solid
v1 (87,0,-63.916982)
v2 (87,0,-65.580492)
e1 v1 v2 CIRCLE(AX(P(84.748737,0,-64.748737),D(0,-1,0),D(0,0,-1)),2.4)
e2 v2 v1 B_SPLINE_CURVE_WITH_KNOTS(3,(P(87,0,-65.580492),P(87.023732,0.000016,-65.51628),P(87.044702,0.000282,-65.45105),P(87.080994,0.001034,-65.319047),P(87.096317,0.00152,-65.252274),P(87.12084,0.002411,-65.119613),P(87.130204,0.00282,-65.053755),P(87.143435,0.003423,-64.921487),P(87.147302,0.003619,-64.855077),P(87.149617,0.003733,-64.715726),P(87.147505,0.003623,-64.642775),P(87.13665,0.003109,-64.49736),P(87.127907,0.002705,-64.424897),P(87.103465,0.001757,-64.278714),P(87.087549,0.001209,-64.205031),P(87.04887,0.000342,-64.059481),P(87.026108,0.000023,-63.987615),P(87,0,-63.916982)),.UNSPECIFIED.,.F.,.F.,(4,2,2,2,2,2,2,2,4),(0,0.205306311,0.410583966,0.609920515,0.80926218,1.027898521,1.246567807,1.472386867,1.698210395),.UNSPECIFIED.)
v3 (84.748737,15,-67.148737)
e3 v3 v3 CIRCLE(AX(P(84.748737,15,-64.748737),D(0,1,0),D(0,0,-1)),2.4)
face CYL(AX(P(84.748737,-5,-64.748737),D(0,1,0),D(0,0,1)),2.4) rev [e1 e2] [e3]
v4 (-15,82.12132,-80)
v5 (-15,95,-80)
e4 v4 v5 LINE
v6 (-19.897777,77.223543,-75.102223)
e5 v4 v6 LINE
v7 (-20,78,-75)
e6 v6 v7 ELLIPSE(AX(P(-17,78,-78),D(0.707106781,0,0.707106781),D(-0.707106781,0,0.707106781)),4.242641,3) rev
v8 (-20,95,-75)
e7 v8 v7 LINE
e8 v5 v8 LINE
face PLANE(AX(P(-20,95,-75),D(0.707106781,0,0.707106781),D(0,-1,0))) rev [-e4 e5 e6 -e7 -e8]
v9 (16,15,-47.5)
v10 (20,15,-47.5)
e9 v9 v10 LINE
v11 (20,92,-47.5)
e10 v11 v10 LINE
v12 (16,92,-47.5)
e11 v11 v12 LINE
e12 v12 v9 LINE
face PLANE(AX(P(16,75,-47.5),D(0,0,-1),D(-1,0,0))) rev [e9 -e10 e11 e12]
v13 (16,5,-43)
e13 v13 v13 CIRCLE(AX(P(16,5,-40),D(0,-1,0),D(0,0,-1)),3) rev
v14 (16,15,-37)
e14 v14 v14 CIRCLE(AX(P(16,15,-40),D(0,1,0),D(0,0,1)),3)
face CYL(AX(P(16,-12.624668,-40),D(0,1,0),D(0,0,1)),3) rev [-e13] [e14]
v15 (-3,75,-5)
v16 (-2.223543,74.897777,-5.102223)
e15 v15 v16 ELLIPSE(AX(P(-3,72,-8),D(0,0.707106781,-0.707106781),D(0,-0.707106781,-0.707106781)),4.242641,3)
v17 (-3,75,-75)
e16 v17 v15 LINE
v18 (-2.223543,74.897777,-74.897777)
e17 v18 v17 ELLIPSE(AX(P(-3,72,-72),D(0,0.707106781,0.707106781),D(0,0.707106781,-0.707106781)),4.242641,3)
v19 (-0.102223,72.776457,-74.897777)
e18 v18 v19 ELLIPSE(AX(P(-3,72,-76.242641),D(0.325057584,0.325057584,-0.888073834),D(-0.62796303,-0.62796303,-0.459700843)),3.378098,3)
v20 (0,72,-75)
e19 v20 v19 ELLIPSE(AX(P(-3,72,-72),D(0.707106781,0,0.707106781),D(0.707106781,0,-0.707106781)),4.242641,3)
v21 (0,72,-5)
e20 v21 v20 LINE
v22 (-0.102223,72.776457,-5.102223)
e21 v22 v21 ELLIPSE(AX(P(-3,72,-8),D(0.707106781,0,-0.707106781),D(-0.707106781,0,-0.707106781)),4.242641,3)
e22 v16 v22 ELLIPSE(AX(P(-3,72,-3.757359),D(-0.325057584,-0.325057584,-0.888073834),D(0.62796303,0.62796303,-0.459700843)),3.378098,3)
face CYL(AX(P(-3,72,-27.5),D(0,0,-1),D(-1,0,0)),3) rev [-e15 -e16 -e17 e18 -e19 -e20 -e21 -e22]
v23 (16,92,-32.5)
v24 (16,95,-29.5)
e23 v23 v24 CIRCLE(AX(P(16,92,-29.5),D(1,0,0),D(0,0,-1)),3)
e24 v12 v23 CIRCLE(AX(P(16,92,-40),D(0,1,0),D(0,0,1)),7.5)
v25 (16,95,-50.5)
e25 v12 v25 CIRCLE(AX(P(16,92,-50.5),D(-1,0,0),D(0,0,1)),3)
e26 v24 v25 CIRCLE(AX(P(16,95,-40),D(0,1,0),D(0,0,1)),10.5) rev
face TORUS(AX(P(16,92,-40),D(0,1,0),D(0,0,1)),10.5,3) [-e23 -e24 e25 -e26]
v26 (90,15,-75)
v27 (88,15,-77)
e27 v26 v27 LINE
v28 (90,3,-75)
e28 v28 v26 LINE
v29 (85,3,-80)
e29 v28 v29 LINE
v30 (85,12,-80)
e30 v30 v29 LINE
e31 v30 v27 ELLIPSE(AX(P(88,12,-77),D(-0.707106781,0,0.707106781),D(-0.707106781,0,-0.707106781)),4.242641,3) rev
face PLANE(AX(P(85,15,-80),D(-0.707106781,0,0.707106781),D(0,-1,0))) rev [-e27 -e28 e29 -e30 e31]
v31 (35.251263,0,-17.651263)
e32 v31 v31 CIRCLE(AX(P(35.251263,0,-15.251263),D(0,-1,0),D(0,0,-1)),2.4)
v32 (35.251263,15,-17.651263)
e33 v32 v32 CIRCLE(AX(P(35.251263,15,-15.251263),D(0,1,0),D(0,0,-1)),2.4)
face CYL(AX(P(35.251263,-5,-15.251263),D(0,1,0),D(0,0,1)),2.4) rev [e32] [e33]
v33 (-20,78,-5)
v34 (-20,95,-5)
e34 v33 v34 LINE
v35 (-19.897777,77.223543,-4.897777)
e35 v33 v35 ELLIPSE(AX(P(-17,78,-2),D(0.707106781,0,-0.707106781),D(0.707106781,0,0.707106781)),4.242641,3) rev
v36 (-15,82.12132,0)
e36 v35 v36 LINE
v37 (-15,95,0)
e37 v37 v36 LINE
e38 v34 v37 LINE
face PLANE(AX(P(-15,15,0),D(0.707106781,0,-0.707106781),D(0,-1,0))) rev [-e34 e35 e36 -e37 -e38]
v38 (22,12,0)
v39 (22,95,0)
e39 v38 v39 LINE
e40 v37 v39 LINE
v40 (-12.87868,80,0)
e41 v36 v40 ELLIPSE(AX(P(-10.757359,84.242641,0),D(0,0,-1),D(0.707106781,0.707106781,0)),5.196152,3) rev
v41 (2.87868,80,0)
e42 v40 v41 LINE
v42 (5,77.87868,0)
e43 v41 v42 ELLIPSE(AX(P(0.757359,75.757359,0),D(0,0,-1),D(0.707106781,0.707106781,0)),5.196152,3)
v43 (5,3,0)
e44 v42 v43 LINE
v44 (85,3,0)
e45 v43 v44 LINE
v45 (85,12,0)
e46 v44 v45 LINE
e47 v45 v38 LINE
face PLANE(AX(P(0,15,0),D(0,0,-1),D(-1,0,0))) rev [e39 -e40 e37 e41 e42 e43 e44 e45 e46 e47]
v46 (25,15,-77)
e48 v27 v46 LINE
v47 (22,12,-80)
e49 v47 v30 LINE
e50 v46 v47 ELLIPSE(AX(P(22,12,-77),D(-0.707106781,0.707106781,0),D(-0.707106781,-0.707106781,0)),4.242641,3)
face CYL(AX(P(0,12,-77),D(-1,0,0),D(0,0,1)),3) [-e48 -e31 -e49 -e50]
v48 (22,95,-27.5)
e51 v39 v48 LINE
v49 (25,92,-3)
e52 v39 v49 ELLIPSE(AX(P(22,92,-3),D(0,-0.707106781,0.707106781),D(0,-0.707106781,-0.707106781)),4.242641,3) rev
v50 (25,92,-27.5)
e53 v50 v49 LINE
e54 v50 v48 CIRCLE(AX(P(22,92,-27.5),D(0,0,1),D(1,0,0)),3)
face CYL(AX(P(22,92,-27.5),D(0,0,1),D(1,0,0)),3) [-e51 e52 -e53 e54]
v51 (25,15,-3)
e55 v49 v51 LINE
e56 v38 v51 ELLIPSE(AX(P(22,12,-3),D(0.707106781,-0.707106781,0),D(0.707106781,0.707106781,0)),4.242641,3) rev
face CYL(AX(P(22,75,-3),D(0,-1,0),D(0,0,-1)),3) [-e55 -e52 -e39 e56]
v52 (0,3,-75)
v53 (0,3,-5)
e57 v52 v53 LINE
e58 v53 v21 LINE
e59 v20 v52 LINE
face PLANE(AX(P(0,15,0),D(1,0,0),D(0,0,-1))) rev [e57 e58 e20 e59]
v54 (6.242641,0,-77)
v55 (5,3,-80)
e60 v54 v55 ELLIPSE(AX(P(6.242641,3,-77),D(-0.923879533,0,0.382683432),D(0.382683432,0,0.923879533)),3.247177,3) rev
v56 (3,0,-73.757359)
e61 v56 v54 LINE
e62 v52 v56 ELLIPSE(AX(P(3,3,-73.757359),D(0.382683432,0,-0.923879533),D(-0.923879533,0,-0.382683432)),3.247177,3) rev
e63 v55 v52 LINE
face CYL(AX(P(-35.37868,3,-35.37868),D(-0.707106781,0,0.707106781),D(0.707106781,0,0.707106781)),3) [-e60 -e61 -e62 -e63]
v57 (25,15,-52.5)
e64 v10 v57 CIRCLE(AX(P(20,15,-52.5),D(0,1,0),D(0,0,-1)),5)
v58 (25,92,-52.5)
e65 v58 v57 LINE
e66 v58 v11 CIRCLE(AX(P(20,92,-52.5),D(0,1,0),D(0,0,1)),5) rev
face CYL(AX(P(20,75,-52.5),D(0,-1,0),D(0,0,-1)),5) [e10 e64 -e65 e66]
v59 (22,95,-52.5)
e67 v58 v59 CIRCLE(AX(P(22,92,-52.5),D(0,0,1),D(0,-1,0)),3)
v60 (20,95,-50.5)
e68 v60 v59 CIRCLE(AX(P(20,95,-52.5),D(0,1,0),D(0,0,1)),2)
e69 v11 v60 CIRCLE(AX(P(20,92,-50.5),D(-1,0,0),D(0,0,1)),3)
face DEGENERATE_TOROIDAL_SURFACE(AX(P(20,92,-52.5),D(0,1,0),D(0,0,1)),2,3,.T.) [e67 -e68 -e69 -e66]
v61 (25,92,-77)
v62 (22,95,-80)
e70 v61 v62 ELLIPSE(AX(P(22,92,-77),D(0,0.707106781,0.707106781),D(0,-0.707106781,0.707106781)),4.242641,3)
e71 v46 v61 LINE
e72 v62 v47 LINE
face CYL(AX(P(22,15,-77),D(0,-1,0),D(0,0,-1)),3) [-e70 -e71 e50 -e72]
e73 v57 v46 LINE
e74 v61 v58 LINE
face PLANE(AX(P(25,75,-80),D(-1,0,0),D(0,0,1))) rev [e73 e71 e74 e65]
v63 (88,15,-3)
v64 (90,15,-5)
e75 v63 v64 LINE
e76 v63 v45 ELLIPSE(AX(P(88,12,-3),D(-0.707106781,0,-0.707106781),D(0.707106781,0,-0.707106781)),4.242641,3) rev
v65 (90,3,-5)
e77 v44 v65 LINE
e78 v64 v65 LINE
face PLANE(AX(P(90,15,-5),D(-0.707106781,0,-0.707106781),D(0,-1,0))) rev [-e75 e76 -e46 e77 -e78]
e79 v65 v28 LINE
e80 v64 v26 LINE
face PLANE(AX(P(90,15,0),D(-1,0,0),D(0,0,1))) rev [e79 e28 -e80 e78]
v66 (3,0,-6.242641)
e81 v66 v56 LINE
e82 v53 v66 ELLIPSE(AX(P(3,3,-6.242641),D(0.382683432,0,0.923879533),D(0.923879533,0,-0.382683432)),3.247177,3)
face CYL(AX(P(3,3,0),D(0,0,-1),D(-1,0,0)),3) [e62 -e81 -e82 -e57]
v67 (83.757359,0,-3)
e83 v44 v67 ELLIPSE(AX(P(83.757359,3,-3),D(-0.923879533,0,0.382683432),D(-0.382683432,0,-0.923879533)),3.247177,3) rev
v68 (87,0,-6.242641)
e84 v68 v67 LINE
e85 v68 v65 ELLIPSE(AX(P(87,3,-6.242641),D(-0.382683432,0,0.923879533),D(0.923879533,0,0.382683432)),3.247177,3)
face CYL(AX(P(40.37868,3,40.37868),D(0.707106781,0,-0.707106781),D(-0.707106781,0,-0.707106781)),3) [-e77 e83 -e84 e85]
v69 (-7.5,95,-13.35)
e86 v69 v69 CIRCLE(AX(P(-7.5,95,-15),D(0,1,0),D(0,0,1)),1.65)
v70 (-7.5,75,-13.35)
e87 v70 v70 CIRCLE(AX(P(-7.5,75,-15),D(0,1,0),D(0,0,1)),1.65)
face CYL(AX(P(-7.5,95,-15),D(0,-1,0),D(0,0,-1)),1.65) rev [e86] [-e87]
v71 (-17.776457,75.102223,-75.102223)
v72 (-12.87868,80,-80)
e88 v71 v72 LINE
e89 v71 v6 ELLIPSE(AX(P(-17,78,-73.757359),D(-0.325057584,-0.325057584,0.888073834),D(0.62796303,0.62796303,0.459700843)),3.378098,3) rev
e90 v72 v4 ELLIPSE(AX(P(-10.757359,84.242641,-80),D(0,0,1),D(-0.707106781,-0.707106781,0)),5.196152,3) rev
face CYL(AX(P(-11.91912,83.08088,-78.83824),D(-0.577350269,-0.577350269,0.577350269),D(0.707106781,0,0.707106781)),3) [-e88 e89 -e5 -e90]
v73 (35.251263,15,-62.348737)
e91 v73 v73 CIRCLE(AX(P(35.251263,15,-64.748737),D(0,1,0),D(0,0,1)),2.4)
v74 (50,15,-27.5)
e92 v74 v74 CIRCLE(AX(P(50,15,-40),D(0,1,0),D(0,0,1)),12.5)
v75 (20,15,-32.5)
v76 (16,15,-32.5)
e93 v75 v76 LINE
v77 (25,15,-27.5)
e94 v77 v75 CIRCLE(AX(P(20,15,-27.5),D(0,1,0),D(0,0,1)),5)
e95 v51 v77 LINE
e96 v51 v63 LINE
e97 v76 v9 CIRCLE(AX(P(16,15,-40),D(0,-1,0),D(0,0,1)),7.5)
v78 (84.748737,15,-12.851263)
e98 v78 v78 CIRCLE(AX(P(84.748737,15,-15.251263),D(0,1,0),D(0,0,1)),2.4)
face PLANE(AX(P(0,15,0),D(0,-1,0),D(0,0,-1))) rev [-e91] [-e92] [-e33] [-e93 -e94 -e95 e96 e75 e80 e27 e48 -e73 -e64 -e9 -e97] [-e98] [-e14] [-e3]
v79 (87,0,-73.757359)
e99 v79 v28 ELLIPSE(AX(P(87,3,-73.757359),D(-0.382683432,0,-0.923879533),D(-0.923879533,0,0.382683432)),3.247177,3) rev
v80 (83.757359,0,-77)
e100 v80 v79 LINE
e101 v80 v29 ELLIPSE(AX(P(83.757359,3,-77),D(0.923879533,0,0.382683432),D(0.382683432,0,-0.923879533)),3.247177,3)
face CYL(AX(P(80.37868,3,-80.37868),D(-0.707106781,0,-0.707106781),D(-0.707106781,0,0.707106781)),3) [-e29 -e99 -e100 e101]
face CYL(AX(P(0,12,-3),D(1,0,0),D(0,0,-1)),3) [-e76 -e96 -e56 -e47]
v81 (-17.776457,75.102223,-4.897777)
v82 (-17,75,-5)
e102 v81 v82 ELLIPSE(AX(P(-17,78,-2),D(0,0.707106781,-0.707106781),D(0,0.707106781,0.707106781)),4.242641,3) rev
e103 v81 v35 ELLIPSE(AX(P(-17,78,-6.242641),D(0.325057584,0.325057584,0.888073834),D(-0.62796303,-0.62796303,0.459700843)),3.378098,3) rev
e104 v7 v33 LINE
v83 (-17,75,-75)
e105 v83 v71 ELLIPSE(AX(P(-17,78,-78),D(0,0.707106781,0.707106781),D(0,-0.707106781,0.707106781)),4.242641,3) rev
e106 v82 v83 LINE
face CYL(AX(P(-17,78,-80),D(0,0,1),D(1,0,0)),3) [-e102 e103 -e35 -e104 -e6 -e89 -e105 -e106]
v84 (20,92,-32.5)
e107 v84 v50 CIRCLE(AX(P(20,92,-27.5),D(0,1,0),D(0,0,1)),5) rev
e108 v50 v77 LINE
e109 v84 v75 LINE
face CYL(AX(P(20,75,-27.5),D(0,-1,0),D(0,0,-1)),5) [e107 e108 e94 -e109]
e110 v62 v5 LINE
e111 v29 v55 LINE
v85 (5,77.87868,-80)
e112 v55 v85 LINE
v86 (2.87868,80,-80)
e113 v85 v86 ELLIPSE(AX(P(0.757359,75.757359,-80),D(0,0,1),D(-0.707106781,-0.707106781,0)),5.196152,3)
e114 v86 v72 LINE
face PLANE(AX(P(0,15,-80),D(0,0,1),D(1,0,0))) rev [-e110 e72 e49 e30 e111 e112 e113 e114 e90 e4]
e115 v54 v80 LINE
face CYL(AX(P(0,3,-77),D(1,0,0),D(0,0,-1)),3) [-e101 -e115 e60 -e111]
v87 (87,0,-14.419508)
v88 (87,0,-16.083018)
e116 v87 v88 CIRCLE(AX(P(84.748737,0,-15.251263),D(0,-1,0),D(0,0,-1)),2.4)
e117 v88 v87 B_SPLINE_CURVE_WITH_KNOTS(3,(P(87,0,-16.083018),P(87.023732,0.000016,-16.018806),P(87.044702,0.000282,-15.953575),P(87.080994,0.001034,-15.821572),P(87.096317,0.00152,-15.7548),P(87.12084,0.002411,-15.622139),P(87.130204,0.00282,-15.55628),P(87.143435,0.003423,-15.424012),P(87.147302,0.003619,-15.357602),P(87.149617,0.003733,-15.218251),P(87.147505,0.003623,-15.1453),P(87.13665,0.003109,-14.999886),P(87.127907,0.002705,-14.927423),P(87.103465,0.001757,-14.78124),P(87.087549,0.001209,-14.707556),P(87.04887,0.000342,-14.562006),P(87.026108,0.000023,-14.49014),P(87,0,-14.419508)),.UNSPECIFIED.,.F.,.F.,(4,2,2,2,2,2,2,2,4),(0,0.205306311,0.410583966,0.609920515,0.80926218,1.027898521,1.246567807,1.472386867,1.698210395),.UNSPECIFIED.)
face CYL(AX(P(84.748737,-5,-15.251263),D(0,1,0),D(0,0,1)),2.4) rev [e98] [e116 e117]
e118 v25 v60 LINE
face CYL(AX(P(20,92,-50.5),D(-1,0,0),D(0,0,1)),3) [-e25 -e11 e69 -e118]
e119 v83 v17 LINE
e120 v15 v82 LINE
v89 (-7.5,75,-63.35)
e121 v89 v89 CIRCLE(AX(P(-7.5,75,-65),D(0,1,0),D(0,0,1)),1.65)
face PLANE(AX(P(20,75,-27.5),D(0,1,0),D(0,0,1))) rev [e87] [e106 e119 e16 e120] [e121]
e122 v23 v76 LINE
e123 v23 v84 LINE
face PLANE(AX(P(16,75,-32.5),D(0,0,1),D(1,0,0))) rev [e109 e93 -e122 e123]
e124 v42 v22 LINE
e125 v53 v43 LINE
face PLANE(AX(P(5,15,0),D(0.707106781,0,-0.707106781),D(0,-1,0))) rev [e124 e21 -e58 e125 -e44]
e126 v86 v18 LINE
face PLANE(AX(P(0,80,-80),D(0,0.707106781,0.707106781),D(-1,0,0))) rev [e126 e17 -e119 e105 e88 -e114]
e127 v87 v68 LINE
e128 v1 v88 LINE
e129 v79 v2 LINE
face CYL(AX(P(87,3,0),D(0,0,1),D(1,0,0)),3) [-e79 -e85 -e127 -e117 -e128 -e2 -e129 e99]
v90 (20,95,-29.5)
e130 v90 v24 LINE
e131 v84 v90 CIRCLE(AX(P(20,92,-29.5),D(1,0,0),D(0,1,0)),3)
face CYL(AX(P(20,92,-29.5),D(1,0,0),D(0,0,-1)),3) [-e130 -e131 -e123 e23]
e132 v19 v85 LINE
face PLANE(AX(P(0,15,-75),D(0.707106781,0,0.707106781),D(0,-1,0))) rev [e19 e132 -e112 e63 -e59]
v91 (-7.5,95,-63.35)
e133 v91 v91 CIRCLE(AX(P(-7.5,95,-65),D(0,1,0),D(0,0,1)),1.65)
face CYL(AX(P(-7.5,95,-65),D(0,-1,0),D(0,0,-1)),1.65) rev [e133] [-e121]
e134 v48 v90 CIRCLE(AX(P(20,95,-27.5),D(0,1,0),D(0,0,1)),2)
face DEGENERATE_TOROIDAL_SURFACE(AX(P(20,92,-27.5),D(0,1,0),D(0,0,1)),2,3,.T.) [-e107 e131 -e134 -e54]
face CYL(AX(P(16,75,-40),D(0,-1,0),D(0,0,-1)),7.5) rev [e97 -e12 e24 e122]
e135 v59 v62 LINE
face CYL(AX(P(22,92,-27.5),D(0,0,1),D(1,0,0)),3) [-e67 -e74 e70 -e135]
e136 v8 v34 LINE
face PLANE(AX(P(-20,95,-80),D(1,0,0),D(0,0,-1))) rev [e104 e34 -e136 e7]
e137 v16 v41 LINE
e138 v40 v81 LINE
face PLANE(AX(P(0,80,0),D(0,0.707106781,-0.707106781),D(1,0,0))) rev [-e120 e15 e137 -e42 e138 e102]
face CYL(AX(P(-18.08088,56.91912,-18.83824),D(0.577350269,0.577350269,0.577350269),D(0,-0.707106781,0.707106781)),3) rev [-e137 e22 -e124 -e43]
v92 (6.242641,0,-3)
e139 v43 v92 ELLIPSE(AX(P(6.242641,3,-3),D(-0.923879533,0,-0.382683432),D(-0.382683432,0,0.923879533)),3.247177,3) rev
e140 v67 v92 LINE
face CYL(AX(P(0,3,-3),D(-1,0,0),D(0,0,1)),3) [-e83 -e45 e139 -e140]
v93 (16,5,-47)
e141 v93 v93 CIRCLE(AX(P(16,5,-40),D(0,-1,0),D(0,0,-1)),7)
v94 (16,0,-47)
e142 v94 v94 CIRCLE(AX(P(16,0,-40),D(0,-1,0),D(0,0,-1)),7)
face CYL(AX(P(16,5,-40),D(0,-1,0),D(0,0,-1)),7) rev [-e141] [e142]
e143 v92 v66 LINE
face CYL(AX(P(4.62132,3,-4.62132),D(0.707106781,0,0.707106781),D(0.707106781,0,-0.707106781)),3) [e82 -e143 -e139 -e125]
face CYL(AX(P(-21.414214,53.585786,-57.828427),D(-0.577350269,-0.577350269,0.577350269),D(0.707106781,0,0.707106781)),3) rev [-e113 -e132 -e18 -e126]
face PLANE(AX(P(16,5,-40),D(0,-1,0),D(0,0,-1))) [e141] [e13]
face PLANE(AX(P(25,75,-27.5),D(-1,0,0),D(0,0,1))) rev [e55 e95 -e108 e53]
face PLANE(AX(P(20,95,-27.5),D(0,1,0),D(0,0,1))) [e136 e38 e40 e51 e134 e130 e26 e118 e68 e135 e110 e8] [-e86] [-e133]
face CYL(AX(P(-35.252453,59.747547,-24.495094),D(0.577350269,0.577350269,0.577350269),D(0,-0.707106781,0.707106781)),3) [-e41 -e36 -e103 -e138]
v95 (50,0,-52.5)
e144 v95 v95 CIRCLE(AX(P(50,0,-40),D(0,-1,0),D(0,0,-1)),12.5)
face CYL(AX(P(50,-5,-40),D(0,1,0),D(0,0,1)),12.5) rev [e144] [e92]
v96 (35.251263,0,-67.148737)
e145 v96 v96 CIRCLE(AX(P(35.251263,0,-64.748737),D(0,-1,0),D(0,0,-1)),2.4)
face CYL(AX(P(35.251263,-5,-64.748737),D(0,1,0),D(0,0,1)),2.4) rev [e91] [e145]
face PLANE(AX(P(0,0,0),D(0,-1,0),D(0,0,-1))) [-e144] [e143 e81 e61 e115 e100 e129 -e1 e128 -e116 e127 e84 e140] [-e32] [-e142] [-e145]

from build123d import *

# Parameters (mm, degrees)
SKETCH1_W           = 90
SKETCH1_H           = 80
BOSS_EXTRUDE1_DEPTH = 15
SKETCH2_R           = 7
CUT_EXTRUDE1_DEPTH  = 5
CHAMFER1_SIZE       = 5
SKETCH3_R           = 2.4
SKETCH3_R_2         = 12.5
SKETCH3_R_3         = 4.25
CUT_EXTRUDE2_DEPTH  = 20
SKETCH4_R           = 6.23126099
SKETCH4_R_2         = 3
BOSS_EXTRUDE2_DEPTH = 10
BOSS_EXTRUDE3_DEPTH = 60
SKETCH6_R           = 1.65
BOSS_EXTRUDE4_DEPTH = 20
CHAMFER2_SIZE       = 5
FILLET1_R           = 3


with BuildPart() as part:
    # Sketch1 → Boss-Extrude1 (new body)
    with BuildSketch(Plane(origin=(0, 0, 0), x_dir=(1, 0, 0), z_dir=(0, 1, 0))):
        with Locations((45, 40)):
            Rectangle(SKETCH1_W, SKETCH1_H)
    extrude(amount=BOSS_EXTRUDE1_DEPTH)

    # Sketch2 → Cut-Extrude1 (cut)
    with BuildSketch(Plane.XZ):
        with Locations(Location((16, -40, 0), (0, 0, 270))):
            Circle(SKETCH2_R)
    extrude(amount=-CUT_EXTRUDE1_DEPTH, mode=Mode.SUBTRACT)

    # Chamfer1
    chamfer1_edges = [part.edges().sort_by_distance(p)[0] for p in [
        (0, 7.5, -80),
        (90, 7.5, -80),
        (90, 7.5, 0),
        (0, 7.5, 0),
    ]]
    chamfer(chamfer1_edges, length=CHAMFER1_SIZE)

    # Sketch3 → Cut-Extrude2 (cut)
    with BuildSketch(Plane(origin=(0, 15, 0), x_dir=(1, 0, 0), z_dir=(0, 1, 0))):
        with Locations(Location((35.251262658, 64.748737342, 0), (0, 0, 270))):
            Circle(SKETCH3_R)
        with Locations(Location((84.748737342, 64.748737342, 0), (0, 0, 90))):
            Circle(SKETCH3_R)
        with Locations(Location((84.748737342, 15.251262658, 0), (0, 0, 270))):
            Circle(SKETCH3_R)
        with Locations(Location((35.251262658, 15.251262658, 0), (0, 0, 90))):
            Circle(SKETCH3_R)
        with Locations(Location((50, 40, 0), (0, 0, 270))):
            Circle(SKETCH3_R_2)
        with Locations(Location((16, 40, 0), (0, 0, 270))):
            Circle(SKETCH3_R_3)
    extrude(amount=-CUT_EXTRUDE2_DEPTH, mode=Mode.SUBTRACT)

    # Sketch4 → Boss-Extrude2 (add)
    with BuildSketch(Plane(origin=(0, 15, 0), x_dir=(1, 0, 0), z_dir=(0, 1, 0))):
        with Locations((16, 40)):
            Circle(SKETCH4_R)
        with Locations(Location((16, 40, 0), (0, 0, 270))):
            Circle(SKETCH4_R_2, mode=Mode.SUBTRACT)
    extrude(amount=-BOSS_EXTRUDE2_DEPTH)

    # Sketch5 → Boss-Extrude3 (add)
    with BuildSketch(Plane(origin=(0, 15, 0), x_dir=(1, 0, 0), z_dir=(0, 1, 0))):
        with BuildLine():
            Line((5, 0), (25, 0))
            Line((25, 0), (25, 27.5))
            ThreePointArc((25, 27.5), (23.535533906, 31.035533906), (20, 32.5))
            Line((20, 32.5), (16, 32.5))
            ThreePointArc((16, 32.5), (8.5, 40), (16, 47.5))
            Line((16, 47.5), (20, 47.5))
            ThreePointArc((20, 47.5), (23.535533906, 48.964466094), (25, 52.5))
            Line((25, 52.5), (25, 80))
            Line((25, 80), (5, 80))
            Line((5, 80), (0, 75))
            Line((0, 75), (0, 5))
            Line((0, 5), (5, 0))
        make_face()
    extrude(amount=BOSS_EXTRUDE3_DEPTH)

    # Sketch6 → Boss-Extrude4 (add)
    with BuildSketch(Plane(origin=(0, 75, 0), x_dir=(1, 0, 0), z_dir=(0, 1, 0))):
        with BuildLine():
            Line((5, 80), (-20, 80))
            Line((-20, 80), (-20, 0))
            Line((-20, 0), (5, 0))
            Line((5, 0), (25, 0))
            Line((25, 0), (25, 27.5))
            ThreePointArc((25, 27.5), (23.535533906, 31.035533906), (20, 32.5))
            Line((20, 32.5), (16, 32.5))
            ThreePointArc((16, 32.5), (8.5, 40), (16, 47.5))
            Line((16, 47.5), (20, 47.5))
            ThreePointArc((20, 47.5), (23.535533906, 48.964466094), (25, 52.5))
            Line((25, 52.5), (25, 80))
            Line((25, 80), (5, 80))
        make_face()
        with Locations(Location((-7.5, 65, 0), (0, 0, 270))):
            Circle(SKETCH6_R, mode=Mode.SUBTRACT)
        with Locations(Location((-7.5, 15, 0), (0, 0, 270))):
            Circle(SKETCH6_R, mode=Mode.SUBTRACT)
    extrude(amount=BOSS_EXTRUDE4_DEPTH)

    # Chamfer2
    chamfer2_edges = [part.edges().sort_by_distance(p)[0] for p in [
        (-20, 85, 0),
        (-7.5, 75, 0),
        (-20, 85, -80),
        (-7.5, 75, -80),
    ]]
    chamfer(chamfer2_edges, length=CHAMFER2_SIZE)

    # Fillet1
    # the kernel refuses this fillet: 3 mm, written as the material it adds along each edge
    with BuildSketch(Plane(origin=(7.5, 82.5, 2.5), x_dir=(-0.816496580927726, 0.40824829046386135, 0.4082482904638647), z_dir=(-0.5773502691896258, -0.5773502691896258, -0.5773502691896258))) as fillet1_piece_1_section:
        with BuildLine():
            CenterArc((FILLET1_R * 0.57735026919, -FILLET1_R), FILLET1_R, 90, 60)
            Line((-FILLET1_R * 0.288675134595, -FILLET1_R * 0.5), (0, 0))
            Line((0, 0), (FILLET1_R * 0.57735026919, 0))
        make_face()
    fillet1_piece_1 = extrude(amount=17.320508076, mode=Mode.PRIVATE)
    fillet1_piece_1 = split(fillet1_piece_1, bisect_by=Plane(origin=(2.443536035, 77.443536035, 0), z_dir=(0, 0, -1)), keep=Keep.TOP, mode=Mode.PRIVATE)
    fillet1_piece_1 = split(fillet1_piece_1, bisect_by=Plane(origin=(0, 77.443536035, -2.121242245), z_dir=(1, 0, 0)), keep=Keep.TOP, mode=Mode.PRIVATE)
    fillet1_piece_1 = split(fillet1_piece_1, bisect_by=Plane(origin=(2.443536035, 75, -2.121242245), z_dir=(0, 1, 0)), keep=Keep.TOP, mode=Mode.PRIVATE)
    add(fillet1_piece_1)
    with BuildSketch(Plane(origin=(7.5, 82.5, 2.5), x_dir=(-0.816496580927726, 0.40824829046386135, 0.4082482904638647), z_dir=(-0.5773502691896258, -0.5773502691896258, -0.5773502691896258))) as fillet1_piece_2_section:
        with BuildLine():
            CenterArc((FILLET1_R * 0.57735026919, -FILLET1_R), FILLET1_R, 90, 60)
            Line((-FILLET1_R * 0.288675134595, -FILLET1_R * 0.5), (0, 0))
            Line((0, 0), (FILLET1_R * 0.57735026919, 0))
        make_face()
    fillet1_piece_2 = extrude(amount=17.320508076, mode=Mode.PRIVATE)
    fillet1_piece_2 = split(fillet1_piece_2, bisect_by=Plane(origin=(0, 74.437654686, -4.39441922), z_dir=(1, 0, 0)), keep=Keep.TOP, mode=Mode.PRIVATE)
    fillet1_piece_2 = split(fillet1_piece_2, bisect_by=Plane(origin=(0.562345314, 75, -4.39441922), z_dir=(0, -1, 0)), keep=Keep.TOP, mode=Mode.PRIVATE)
    add(fillet1_piece_2)
    with BuildSketch(Plane(origin=(7.5, 82.5, 2.5), x_dir=(-0.816496580927726, 0.40824829046386135, 0.4082482904638647), z_dir=(-0.5773502691896258, -0.5773502691896258, -0.5773502691896258))) as fillet1_piece_3_section:
        with BuildLine():
            CenterArc((FILLET1_R * 0.57735026919, -FILLET1_R), FILLET1_R, 90, 60)
            Line((-FILLET1_R * 0.288675134595, -FILLET1_R * 0.5), (0, 0))
            Line((0, 0), (FILLET1_R * 0.57735026919, 0))
        make_face()
    fillet1_piece_3 = extrude(amount=17.320508076, mode=Mode.PRIVATE)
    fillet1_piece_3 = split(fillet1_piece_3, bisect_by=Plane(origin=(0, 75.562345314, -4.39441922), z_dir=(-1, 0, 0)), keep=Keep.TOP, mode=Mode.PRIVATE)
    fillet1_piece_3 = split(fillet1_piece_3, bisect_by=Plane(origin=(-0.562345314, 75, -4.39441922), z_dir=(0, 1, 0)), keep=Keep.TOP, mode=Mode.PRIVATE)
    add(fillet1_piece_3)
    with BuildSketch(Plane(origin=(7.5, 82.5, -82.5), x_dir=(0.40824829046386274, -0.816496580927726, -0.40824829046386324), z_dir=(-0.5773502691896258, -0.5773502691896258, 0.5773502691896258))) as fillet1_piece_4_section:
        with BuildLine():
            CenterArc((FILLET1_R * 0.57735026919, -FILLET1_R), FILLET1_R, 90, 60)
            Line((-FILLET1_R * 0.288675134595, -FILLET1_R * 0.5), (0, 0))
            Line((0, 0), (FILLET1_R * 0.57735026919, 0))
        make_face()
    fillet1_piece_4 = extrude(amount=17.320508076, mode=Mode.PRIVATE)
    fillet1_piece_4 = split(fillet1_piece_4, bisect_by=Plane(origin=(2.443536035, 77.443536035, -80), z_dir=(0, 0, 1)), keep=Keep.TOP, mode=Mode.PRIVATE)
    fillet1_piece_4 = split(fillet1_piece_4, bisect_by=Plane(origin=(0, 77.443536035, -77.878757755), z_dir=(1, 0, 0)), keep=Keep.TOP, mode=Mode.PRIVATE)
    fillet1_piece_4 = split(fillet1_piece_4, bisect_by=Plane(origin=(2.443536035, 75, -77.878757755), z_dir=(0, 1, 0)), keep=Keep.TOP, mode=Mode.PRIVATE)
    add(fillet1_piece_4)
    with BuildSketch(Plane(origin=(7.5, 82.5, -82.5), x_dir=(0.40824829046386274, -0.816496580927726, -0.40824829046386324), z_dir=(-0.5773502691896258, -0.5773502691896258, 0.5773502691896258))) as fillet1_piece_5_section:
        with BuildLine():
            CenterArc((FILLET1_R * 0.57735026919, -FILLET1_R), FILLET1_R, 90, 60)
            Line((-FILLET1_R * 0.288675134595, -FILLET1_R * 0.5), (0, 0))
            Line((0, 0), (FILLET1_R * 0.57735026919, 0))
        make_face()
    fillet1_piece_5 = extrude(amount=17.320508076, mode=Mode.PRIVATE)
    fillet1_piece_5 = split(fillet1_piece_5, bisect_by=Plane(origin=(0, 75.562345314, -75.60558078), z_dir=(-1, 0, 0)), keep=Keep.TOP, mode=Mode.PRIVATE)
    fillet1_piece_5 = split(fillet1_piece_5, bisect_by=Plane(origin=(-0.562345314, 75, -75.60558078), z_dir=(0, 1, 0)), keep=Keep.TOP, mode=Mode.PRIVATE)
    add(fillet1_piece_5)
    with BuildSketch(Plane(origin=(7.5, 82.5, -82.5), x_dir=(0.40824829046386274, -0.816496580927726, -0.40824829046386324), z_dir=(-0.5773502691896258, -0.5773502691896258, 0.5773502691896258))) as fillet1_piece_6_section:
        with BuildLine():
            CenterArc((FILLET1_R * 0.57735026919, -FILLET1_R), FILLET1_R, 90, 60)
            Line((-FILLET1_R * 0.288675134595, -FILLET1_R * 0.5), (0, 0))
            Line((0, 0), (FILLET1_R * 0.57735026919, 0))
        make_face()
    fillet1_piece_6 = extrude(amount=17.320508076, mode=Mode.PRIVATE)
    fillet1_piece_6 = split(fillet1_piece_6, bisect_by=Plane(origin=(0, 74.437654686, -75.60558078), z_dir=(1, 0, 0)), keep=Keep.TOP, mode=Mode.PRIVATE)
    fillet1_piece_6 = split(fillet1_piece_6, bisect_by=Plane(origin=(0.562345314, 75, -75.60558078), z_dir=(0, -1, 0)), keep=Keep.TOP, mode=Mode.PRIVATE)
    add(fillet1_piece_6)
    with BuildSketch(Plane(origin=(0, 75, -82.5), x_dir=(0, -1, 0), z_dir=(0, 0, 1))) as fillet1_piece_7_section:
        with BuildLine():
            CenterArc((FILLET1_R, -FILLET1_R), FILLET1_R, 90, 90)
            Line((0, -FILLET1_R), (0, 0))
            Line((0, 0), (FILLET1_R, 0))
        make_face()
    fillet1_piece_7 = extrude(amount=85, mode=Mode.PRIVATE)
    fillet1_piece_7 = split(fillet1_piece_7, bisect_by=Plane(origin=(-1.222323404, 74.871054126, -73.777676596), z_dir=(-0.7071067811865476, 0, -0.7071067811865476)), keep=Keep.TOP, mode=Mode.PRIVATE)
    fillet1_piece_7 = split(fillet1_piece_7, bisect_by=Plane(origin=(-1.586782581, 74.506594949, -74.506594949), z_dir=(0, 0.7071067811865476, 0.7071067811865476)), keep=Keep.TOP, mode=Mode.PRIVATE)
    add(fillet1_piece_7)
    with BuildSketch(Plane(origin=(0, 75, -82.5), x_dir=(0, -1, 0), z_dir=(0, 0, 1))) as fillet1_piece_8_section:
        with BuildLine():
            CenterArc((FILLET1_R, -FILLET1_R), FILLET1_R, 90, 90)
            Line((0, -FILLET1_R), (0, 0))
            Line((0, 0), (FILLET1_R, 0))
        make_face()
    fillet1_piece_8 = extrude(amount=85, mode=Mode.PRIVATE)
    fillet1_piece_8 = split(fillet1_piece_8, bisect_by=Plane(origin=(-0.493405051, 73.413217419, -74.506594949), z_dir=(0.7071067811865476, 0, 0.7071067811865476)), keep=Keep.TOP, mode=Mode.PRIVATE)
    fillet1_piece_8 = split(fillet1_piece_8, bisect_by=Plane(origin=(-0.128945874, 73.777676596, -73.777676596), z_dir=(0, -0.7071067811865476, -0.7071067811865476)), keep=Keep.TOP, mode=Mode.PRIVATE)
    add(fillet1_piece_8)
    with BuildSketch(Plane(origin=(0, 75, -82.5), x_dir=(0, -1, 0), z_dir=(0, 0, 1))) as fillet1_piece_9_section:
        with BuildLine():
            CenterArc((FILLET1_R, -FILLET1_R), FILLET1_R, 90, 90)
            Line((0, -FILLET1_R), (0, 0))
            Line((0, 0), (FILLET1_R, 0))
        make_face()
    fillet1_piece_9 = extrude(amount=85, mode=Mode.PRIVATE)
    fillet1_piece_9 = split(fillet1_piece_9, bisect_by=Plane(origin=(-17.837124827, 74.325750345, -57.162875173), z_dir=(0.7071067811865476, 0, 0.7071067811865476)), keep=Keep.TOP, mode=Mode.PRIVATE)
    fillet1_piece_9 = split(fillet1_piece_9, bisect_by=Plane(origin=(-17.837124827, 74.325750345, -22.837124827), z_dir=(0.7071067811865476, 0, -0.7071067811865476)), keep=Keep.TOP, mode=Mode.PRIVATE)
    fillet1_piece_9 = split(fillet1_piece_9, bisect_by=Plane(origin=(-0.674249655, 57.162875173, -57.162875173), z_dir=(0, 0.7071067811865476, 0.7071067811865476)), keep=Keep.TOP, mode=Mode.PRIVATE)
    fillet1_piece_9 = split(fillet1_piece_9, bisect_by=Plane(origin=(-0.674249655, 57.162875173, -22.837124827), z_dir=(0, 0.7071067811865476, -0.7071067811865476)), keep=Keep.TOP, mode=Mode.PRIVATE)
    add(fillet1_piece_9)
    with BuildSketch(Plane(origin=(0, 75, -82.5), x_dir=(0, -1, 0), z_dir=(0, 0, 1))) as fillet1_piece_10_section:
        with BuildLine():
            CenterArc((FILLET1_R, -FILLET1_R), FILLET1_R, 90, 90)
            Line((0, -FILLET1_R), (0, 0))
            Line((0, 0), (FILLET1_R, 0))
        make_face()
    fillet1_piece_10 = extrude(amount=85, mode=Mode.PRIVATE)
    fillet1_piece_10 = split(fillet1_piece_10, bisect_by=Plane(origin=(-1.222323404, 74.871054126, -6.222323404), z_dir=(-0.7071067811865476, 0, 0.7071067811865476)), keep=Keep.TOP, mode=Mode.PRIVATE)
    fillet1_piece_10 = split(fillet1_piece_10, bisect_by=Plane(origin=(-1.586782581, 74.506594949, -5.493405051), z_dir=(0, 0.7071067811865476, -0.7071067811865476)), keep=Keep.TOP, mode=Mode.PRIVATE)
    add(fillet1_piece_10)
    with BuildSketch(Plane(origin=(0, 75, -82.5), x_dir=(0, -1, 0), z_dir=(0, 0, 1))) as fillet1_piece_11_section:
        with BuildLine():
            CenterArc((FILLET1_R, -FILLET1_R), FILLET1_R, 90, 90)
            Line((0, -FILLET1_R), (0, 0))
            Line((0, 0), (FILLET1_R, 0))
        make_face()
    fillet1_piece_11 = extrude(amount=85, mode=Mode.PRIVATE)
    fillet1_piece_11 = split(fillet1_piece_11, bisect_by=Plane(origin=(-0.493405051, 73.413217419, -5.493405051), z_dir=(0.7071067811865476, 0, -0.7071067811865476)), keep=Keep.TOP, mode=Mode.PRIVATE)
    fillet1_piece_11 = split(fillet1_piece_11, bisect_by=Plane(origin=(-0.128945874, 73.777676596, -6.222323404), z_dir=(0, -0.7071067811865476, 0.7071067811865476)), keep=Keep.TOP, mode=Mode.PRIVATE)
    add(fillet1_piece_11)
    with BuildSketch(Plane(origin=(0, 75, -82.5), x_dir=(0, -1, 0), z_dir=(0, 0, 1))) as fillet1_piece_12a_section:
        with BuildLine():
            CenterArc((FILLET1_R, -FILLET1_R), FILLET1_R, 90, 90)
            Line((0, -FILLET1_R), (0, 0))
            Line((0, 0), (FILLET1_R, 0))
        make_face()
    fillet1_piece_12a = extrude(amount=85, mode=Mode.PRIVATE)
    fillet1_piece_12a = split(fillet1_piece_12a, bisect_by=Plane(origin=(1.47794047, 74.320292137, -3.52205953), z_dir=(-0.7071067811865476, 0, 0.7071067811865476)), keep=Keep.TOP, mode=Mode.PRIVATE)
    fillet1_piece_12a = split(fillet1_piece_12a, bisect_by=Plane(origin=(-0.679707863, 76.47794047, -3.52205953), z_dir=(0, -0.7071067811865476, 0.7071067811865476)), keep=Keep.TOP, mode=Mode.PRIVATE)
    with BuildSketch(Plane(origin=(7.5, 82.5, 2.5), x_dir=(-0.816496580927726, 0.40824829046386135, 0.4082482904638647), z_dir=(-0.5773502691896258, -0.5773502691896258, -0.5773502691896258))) as fillet1_piece_12b_section:
        with BuildLine():
            CenterArc((FILLET1_R * 0.57735026919, -FILLET1_R), FILLET1_R, 90, 60)
            Line((-FILLET1_R * 0.288675134595, -FILLET1_R * 0.5), (0, 0))
            Line((0, 0), (FILLET1_R * 0.57735026919, 0))
        make_face()
    fillet1_piece_12b = extrude(amount=17.320508076, mode=Mode.PRIVATE)
    fillet1_piece_12b = split(fillet1_piece_12b, bisect_by=Plane(origin=(0, 73.512134225, -6.043248673), z_dir=(-1, 0, 0)), keep=Keep.TOP, mode=Mode.PRIVATE)
    fillet1_piece_12b = split(fillet1_piece_12b, bisect_by=Plane(origin=(-1.487865775, 75, -6.043248673), z_dir=(0, -1, 0)), keep=Keep.TOP, mode=Mode.PRIVATE)
    fillet1_piece_12 = fillet1_piece_12a & fillet1_piece_12b
    add(fillet1_piece_12)
    with BuildSketch(Plane(origin=(7.5, 82.5, -82.5), x_dir=(0.40824829046386274, -0.816496580927726, -0.40824829046386324), z_dir=(-0.5773502691896258, -0.5773502691896258, 0.5773502691896258))) as fillet1_piece_13a_section:
        with BuildLine():
            CenterArc((FILLET1_R * 0.57735026919, -FILLET1_R), FILLET1_R, 90, 60)
            Line((-FILLET1_R * 0.288675134595, -FILLET1_R * 0.5), (0, 0))
            Line((0, 0), (FILLET1_R * 0.57735026919, 0))
        make_face()
    fillet1_piece_13a = extrude(amount=17.320508076, mode=Mode.PRIVATE)
    fillet1_piece_13a = split(fillet1_piece_13a, bisect_by=Plane(origin=(0, 73.512134225, -73.956751327), z_dir=(-1, 0, 0)), keep=Keep.TOP, mode=Mode.PRIVATE)
    fillet1_piece_13a = split(fillet1_piece_13a, bisect_by=Plane(origin=(-1.487865775, 75, -73.956751327), z_dir=(0, -1, 0)), keep=Keep.TOP, mode=Mode.PRIVATE)
    with BuildSketch(Plane(origin=(0, 75, -82.5), x_dir=(0, -1, 0), z_dir=(0, 0, 1))) as fillet1_piece_13b_section:
        with BuildLine():
            CenterArc((FILLET1_R, -FILLET1_R), FILLET1_R, 90, 90)
            Line((0, -FILLET1_R), (0, 0))
            Line((0, 0), (FILLET1_R, 0))
        make_face()
    fillet1_piece_13b = extrude(amount=85, mode=Mode.PRIVATE)
    fillet1_piece_13b = split(fillet1_piece_13b, bisect_by=Plane(origin=(1.47794047, 74.320292137, -76.47794047), z_dir=(-0.7071067811865476, 0, -0.7071067811865476)), keep=Keep.TOP, mode=Mode.PRIVATE)
    fillet1_piece_13b = split(fillet1_piece_13b, bisect_by=Plane(origin=(-0.679707863, 76.47794047, -76.47794047), z_dir=(0, -0.7071067811865476, -0.7071067811865476)), keep=Keep.TOP, mode=Mode.PRIVATE)
    fillet1_piece_13 = fillet1_piece_13a & fillet1_piece_13b
    add(fillet1_piece_13)
    # the kernel refuses this fillet: 3 mm, written as the material it takes off along each edge
    with BuildSketch(Plane(origin=(25, 95, 7.5), x_dir=(0, -1, 0), z_dir=(0, 0, -1)), Plane(origin=(25, 95, -52.5), x_dir=(0, -1, 0), z_dir=(0, 0, -1))) as fillet1_2_piece_1:
        with BuildLine():
            CenterArc((FILLET1_R, FILLET1_R), FILLET1_R, 180, 90)
            Line((0, FILLET1_R), (0, 0))
            Line((0, 0), (FILLET1_R, 0))
        make_face()
    extrude(amount=35, mode=Mode.SUBTRACT)
    with BuildSketch(Plane(origin=(20, 95, -27.5), x_dir=(1, 0, 0), z_dir=(0, 0, 1))) as fillet1_2_piece_2:
        with BuildLine():
            CenterArc((5 - FILLET1_R, -FILLET1_R), FILLET1_R, 0, 90)
            Line((5 - FILLET1_R, 0), (5, 0))
            Line((5, 0), (5, -FILLET1_R))
        make_face()
    revolve(axis=Axis((20, 95, -27.5), (0, 1, 0)), revolution_arc=90, mode=Mode.SUBTRACT)
    with BuildSketch(Plane(origin=(20, 95, -32.5), x_dir=(0, -1, 0), z_dir=(-1, 0, 0)), Plane(origin=(16, 95, -47.5), x_dir=(0, -1, 0), z_dir=(1, 0, 0))) as fillet1_2_piece_3:
        with BuildLine():
            CenterArc((FILLET1_R, FILLET1_R), FILLET1_R, 180, 90)
            Line((0, FILLET1_R), (0, 0))
            Line((0, 0), (FILLET1_R, 0))
        make_face()
    extrude(amount=4, mode=Mode.SUBTRACT)
    with BuildSketch(Plane(origin=(16, 95, -40), x_dir=(0, 0, 1), z_dir=(1, 0, 0))) as fillet1_2_piece_4:
        with BuildLine():
            CenterArc((7.5 + FILLET1_R, FILLET1_R), FILLET1_R, 180, 90)
            Line((7.5 + FILLET1_R, 0), (7.5, 0))
            Line((7.5, 0), (7.5, FILLET1_R))
        make_face()
    revolve(axis=Axis((16, 95, -40), (0, -1, 0)), revolution_arc=180, mode=Mode.SUBTRACT)
    with BuildSketch(Plane(origin=(20, 95, -52.5), x_dir=(0, 0, 1), z_dir=(-1, 0, 0))) as fillet1_2_piece_5:
        with BuildLine():
            CenterArc((5 - FILLET1_R, -FILLET1_R), FILLET1_R, 0, 90)
            Line((5 - FILLET1_R, 0), (5, 0))
            Line((5, 0), (5, -FILLET1_R))
        make_face()
    revolve(axis=Axis((20, 95, -52.5), (0, 1, 0)), revolution_arc=90, mode=Mode.SUBTRACT)
    with BuildSketch(Plane(origin=(-20, 75, -82.5), x_dir=(0, 1, 0), z_dir=(0, 0, 1)), Plane(origin=(0, 0, -82.5), x_dir=(0, 1, 0), z_dir=(0, 0, 1)), Plane(origin=(90, 0, 2.5), x_dir=(0, 1, 0), z_dir=(0, 0, -1))) as fillet1_2_piece_6:
        with BuildLine():
            CenterArc((FILLET1_R, -FILLET1_R), FILLET1_R, 90, 90)
            Line((0, -FILLET1_R), (0, 0))
            Line((0, 0), (FILLET1_R, 0))
        make_face()
    extrude(amount=85, mode=Mode.SUBTRACT)
    with BuildSketch(Plane(origin=(-12.5, 82.5, 2.5), x_dir=(-0.4082482904638625, 0.8164965809277261, -0.4082482904638636), z_dir=(-0.5773502691896258, -0.5773502691896258, -0.5773502691896258))) as fillet1_2_piece_7:
        with BuildLine():
            CenterArc((FILLET1_R * 0.57735026919, FILLET1_R), FILLET1_R, 210, 60)
            Line((-FILLET1_R * 0.288675134595, FILLET1_R * 0.5), (0, 0))
            Line((0, 0), (FILLET1_R * 0.57735026919, 0))
        make_face()
    extrude(amount=17.320508076, mode=Mode.SUBTRACT)
    with BuildSketch(Plane(origin=(-12.5, 82.5, -82.5), x_dir=(-0.40824829046386046, 0.816496580927726, 0.40824829046386557), z_dir=(-0.5773502691896258, -0.5773502691896258, 0.5773502691896258))) as fillet1_2_piece_8:
        with BuildLine():
            CenterArc((FILLET1_R * 0.57735026919, -FILLET1_R), FILLET1_R, 90, 60)
            Line((-FILLET1_R * 0.288675134595, -FILLET1_R * 0.5), (0, 0))
            Line((0, 0), (FILLET1_R * 0.57735026919, 0))
        make_face()
    extrude(amount=17.320508076, mode=Mode.SUBTRACT)
    with BuildSketch(Plane(origin=(92.5, 0, -80), x_dir=(0, 1, 0), z_dir=(-1, 0, 0)), Plane(origin=(-2.5, 0, 0), x_dir=(0, 1, 0), z_dir=(1, 0, 0))) as fillet1_2_piece_9:
        with BuildLine():
            CenterArc((FILLET1_R, -FILLET1_R), FILLET1_R, 90, 90)
            Line((0, -FILLET1_R), (0, 0))
            Line((0, 0), (FILLET1_R, 0))
        make_face()
    extrude(amount=95, mode=Mode.SUBTRACT)
    with BuildSketch(Plane(origin=(92.5, 15, -80), x_dir=(0, -1, 0), z_dir=(-1, 0, 0)), Plane(origin=(25, 15, 0), x_dir=(0, -1, 0), z_dir=(1, 0, 0))) as fillet1_2_piece_10:
        with BuildLine():
            CenterArc((FILLET1_R, FILLET1_R), FILLET1_R, 180, 90)
            Line((0, FILLET1_R), (0, 0))
            Line((0, 0), (FILLET1_R, 0))
        make_face()
    extrude(amount=67.5, mode=Mode.SUBTRACT)
    with BuildSketch(Plane(origin=(10.303300859, 0, 5.303300859), x_dir=(0, 1, 0), z_dir=(-0.7071067811865476, 0, -0.7071067811865476)), Plane(origin=(79.696699141, 0, 5.303300859), x_dir=(-0.7071067811865476, 0, -0.7071067811865476), z_dir=(0.7071067811865476, 0, -0.7071067811865476)), Plane(origin=(-5.303300859, 0, -69.696699141), x_dir=(0, 1, 0), z_dir=(0.7071067811865476, 0, -0.7071067811865476))) as fillet1_2_piece_11:
        with BuildLine():
            CenterArc((FILLET1_R, FILLET1_R), FILLET1_R, 180, 90)
            Line((0, FILLET1_R), (0, 0))
            Line((0, 0), (FILLET1_R, 0))
        make_face()
    extrude(amount=22.071067812, mode=Mode.SUBTRACT)
    with BuildSketch(Plane(origin=(95.303300859, 0, -69.696699141), x_dir=(0, 1, 0), z_dir=(-0.7071067811865476, 0, -0.7071067811865476))) as fillet1_2_piece_12:
        with BuildLine():
            CenterArc((FILLET1_R, -FILLET1_R), FILLET1_R, 90, 90)
            Line((0, -FILLET1_R), (0, 0))
            Line((0, 0), (FILLET1_R, 0))
        make_face()
    extrude(amount=22.071067812, mode=Mode.SUBTRACT)
    with BuildSketch(Plane(origin=(25, 15, 0), x_dir=(-1, 0, 0), z_dir=(0, 1, 0)), Plane(origin=(25, 102.5, -80), x_dir=(-1, 0, 0), z_dir=(0, -1, 0))) as fillet1_2_piece_13:
        with BuildLine():
            CenterArc((FILLET1_R, -FILLET1_R), FILLET1_R, 90, 90)
            Line((0, -FILLET1_R), (0, 0))
            Line((0, 0), (FILLET1_R, 0))
        make_face()
    extrude(amount=87.5, mode=Mode.SUBTRACT)
    with BuildSketch(Plane(origin=(92.5, 15, -80), x_dir=(0, -1, 0), z_dir=(-1, 0, 0))) as fillet1_2_piece_14a_section:
        with BuildLine():
            CenterArc((FILLET1_R, FILLET1_R), FILLET1_R, 180, 90)
            Line((0, FILLET1_R), (0, 0))
            Line((0, 0), (FILLET1_R, 0))
        make_face()
    fillet1_2_piece_14a = extrude(amount=75, mode=Mode.PRIVATE)
    fillet1_2_piece_14a = split(fillet1_2_piece_14a, bisect_by=Plane(origin=(25, 14.320814657, -79.320814657), z_dir=(-1, 0, 0)), keep=Keep.TOP, mode=Mode.PRIVATE)
    with BuildSketch(Plane(origin=(25, 102.5, -80), x_dir=(-1, 0, 0), z_dir=(0, -1, 0))) as fillet1_2_piece_14b_section:
        with BuildLine():
            CenterArc((FILLET1_R, -FILLET1_R), FILLET1_R, 90, 90)
            Line((0, -FILLET1_R), (0, 0))
            Line((0, 0), (FILLET1_R, 0))
        make_face()
    fillet1_2_piece_14b = extrude(amount=95, mode=Mode.PRIVATE)
    fillet1_2_piece_14b = split(fillet1_2_piece_14b, bisect_by=Plane(origin=(24.320814657, 15, -79.320814657), z_dir=(0, -1, 0)), keep=Keep.TOP, mode=Mode.PRIVATE)
    fillet1_2_piece_14 = fillet1_2_piece_14a & fillet1_2_piece_14b
    add(fillet1_2_piece_14, mode=Mode.SUBTRACT)
    with BuildSketch(Plane(origin=(25, 7.5, 0), x_dir=(-1, 0, 0), z_dir=(0, 1, 0))) as fillet1_2_piece_15a_section:
        with BuildLine():
            CenterArc((FILLET1_R, -FILLET1_R), FILLET1_R, 90, 90)
            Line((0, -FILLET1_R), (0, 0))
            Line((0, 0), (FILLET1_R, 0))
        make_face()
    fillet1_2_piece_15a = extrude(amount=95, mode=Mode.PRIVATE)
    fillet1_2_piece_15a = split(fillet1_2_piece_15a, bisect_by=Plane(origin=(24.320814657, 15, -0.679185343), z_dir=(0, -1, 0)), keep=Keep.TOP, mode=Mode.PRIVATE)
    with BuildSketch(Plane(origin=(17.5, 15, 0), x_dir=(0, -1, 0), z_dir=(1, 0, 0))) as fillet1_2_piece_15b_section:
        with BuildLine():
            CenterArc((FILLET1_R, FILLET1_R), FILLET1_R, 180, 90)
            Line((0, FILLET1_R), (0, 0))
            Line((0, 0), (FILLET1_R, 0))
        make_face()
    fillet1_2_piece_15b = extrude(amount=75, mode=Mode.PRIVATE)
    fillet1_2_piece_15b = split(fillet1_2_piece_15b, bisect_by=Plane(origin=(25, 14.320814657, -0.679185343), z_dir=(-1, 0, 0)), keep=Keep.TOP, mode=Mode.PRIVATE)
    fillet1_2_piece_15 = fillet1_2_piece_15a & fillet1_2_piece_15b
    add(fillet1_2_piece_15, mode=Mode.SUBTRACT)


solid = part.part
